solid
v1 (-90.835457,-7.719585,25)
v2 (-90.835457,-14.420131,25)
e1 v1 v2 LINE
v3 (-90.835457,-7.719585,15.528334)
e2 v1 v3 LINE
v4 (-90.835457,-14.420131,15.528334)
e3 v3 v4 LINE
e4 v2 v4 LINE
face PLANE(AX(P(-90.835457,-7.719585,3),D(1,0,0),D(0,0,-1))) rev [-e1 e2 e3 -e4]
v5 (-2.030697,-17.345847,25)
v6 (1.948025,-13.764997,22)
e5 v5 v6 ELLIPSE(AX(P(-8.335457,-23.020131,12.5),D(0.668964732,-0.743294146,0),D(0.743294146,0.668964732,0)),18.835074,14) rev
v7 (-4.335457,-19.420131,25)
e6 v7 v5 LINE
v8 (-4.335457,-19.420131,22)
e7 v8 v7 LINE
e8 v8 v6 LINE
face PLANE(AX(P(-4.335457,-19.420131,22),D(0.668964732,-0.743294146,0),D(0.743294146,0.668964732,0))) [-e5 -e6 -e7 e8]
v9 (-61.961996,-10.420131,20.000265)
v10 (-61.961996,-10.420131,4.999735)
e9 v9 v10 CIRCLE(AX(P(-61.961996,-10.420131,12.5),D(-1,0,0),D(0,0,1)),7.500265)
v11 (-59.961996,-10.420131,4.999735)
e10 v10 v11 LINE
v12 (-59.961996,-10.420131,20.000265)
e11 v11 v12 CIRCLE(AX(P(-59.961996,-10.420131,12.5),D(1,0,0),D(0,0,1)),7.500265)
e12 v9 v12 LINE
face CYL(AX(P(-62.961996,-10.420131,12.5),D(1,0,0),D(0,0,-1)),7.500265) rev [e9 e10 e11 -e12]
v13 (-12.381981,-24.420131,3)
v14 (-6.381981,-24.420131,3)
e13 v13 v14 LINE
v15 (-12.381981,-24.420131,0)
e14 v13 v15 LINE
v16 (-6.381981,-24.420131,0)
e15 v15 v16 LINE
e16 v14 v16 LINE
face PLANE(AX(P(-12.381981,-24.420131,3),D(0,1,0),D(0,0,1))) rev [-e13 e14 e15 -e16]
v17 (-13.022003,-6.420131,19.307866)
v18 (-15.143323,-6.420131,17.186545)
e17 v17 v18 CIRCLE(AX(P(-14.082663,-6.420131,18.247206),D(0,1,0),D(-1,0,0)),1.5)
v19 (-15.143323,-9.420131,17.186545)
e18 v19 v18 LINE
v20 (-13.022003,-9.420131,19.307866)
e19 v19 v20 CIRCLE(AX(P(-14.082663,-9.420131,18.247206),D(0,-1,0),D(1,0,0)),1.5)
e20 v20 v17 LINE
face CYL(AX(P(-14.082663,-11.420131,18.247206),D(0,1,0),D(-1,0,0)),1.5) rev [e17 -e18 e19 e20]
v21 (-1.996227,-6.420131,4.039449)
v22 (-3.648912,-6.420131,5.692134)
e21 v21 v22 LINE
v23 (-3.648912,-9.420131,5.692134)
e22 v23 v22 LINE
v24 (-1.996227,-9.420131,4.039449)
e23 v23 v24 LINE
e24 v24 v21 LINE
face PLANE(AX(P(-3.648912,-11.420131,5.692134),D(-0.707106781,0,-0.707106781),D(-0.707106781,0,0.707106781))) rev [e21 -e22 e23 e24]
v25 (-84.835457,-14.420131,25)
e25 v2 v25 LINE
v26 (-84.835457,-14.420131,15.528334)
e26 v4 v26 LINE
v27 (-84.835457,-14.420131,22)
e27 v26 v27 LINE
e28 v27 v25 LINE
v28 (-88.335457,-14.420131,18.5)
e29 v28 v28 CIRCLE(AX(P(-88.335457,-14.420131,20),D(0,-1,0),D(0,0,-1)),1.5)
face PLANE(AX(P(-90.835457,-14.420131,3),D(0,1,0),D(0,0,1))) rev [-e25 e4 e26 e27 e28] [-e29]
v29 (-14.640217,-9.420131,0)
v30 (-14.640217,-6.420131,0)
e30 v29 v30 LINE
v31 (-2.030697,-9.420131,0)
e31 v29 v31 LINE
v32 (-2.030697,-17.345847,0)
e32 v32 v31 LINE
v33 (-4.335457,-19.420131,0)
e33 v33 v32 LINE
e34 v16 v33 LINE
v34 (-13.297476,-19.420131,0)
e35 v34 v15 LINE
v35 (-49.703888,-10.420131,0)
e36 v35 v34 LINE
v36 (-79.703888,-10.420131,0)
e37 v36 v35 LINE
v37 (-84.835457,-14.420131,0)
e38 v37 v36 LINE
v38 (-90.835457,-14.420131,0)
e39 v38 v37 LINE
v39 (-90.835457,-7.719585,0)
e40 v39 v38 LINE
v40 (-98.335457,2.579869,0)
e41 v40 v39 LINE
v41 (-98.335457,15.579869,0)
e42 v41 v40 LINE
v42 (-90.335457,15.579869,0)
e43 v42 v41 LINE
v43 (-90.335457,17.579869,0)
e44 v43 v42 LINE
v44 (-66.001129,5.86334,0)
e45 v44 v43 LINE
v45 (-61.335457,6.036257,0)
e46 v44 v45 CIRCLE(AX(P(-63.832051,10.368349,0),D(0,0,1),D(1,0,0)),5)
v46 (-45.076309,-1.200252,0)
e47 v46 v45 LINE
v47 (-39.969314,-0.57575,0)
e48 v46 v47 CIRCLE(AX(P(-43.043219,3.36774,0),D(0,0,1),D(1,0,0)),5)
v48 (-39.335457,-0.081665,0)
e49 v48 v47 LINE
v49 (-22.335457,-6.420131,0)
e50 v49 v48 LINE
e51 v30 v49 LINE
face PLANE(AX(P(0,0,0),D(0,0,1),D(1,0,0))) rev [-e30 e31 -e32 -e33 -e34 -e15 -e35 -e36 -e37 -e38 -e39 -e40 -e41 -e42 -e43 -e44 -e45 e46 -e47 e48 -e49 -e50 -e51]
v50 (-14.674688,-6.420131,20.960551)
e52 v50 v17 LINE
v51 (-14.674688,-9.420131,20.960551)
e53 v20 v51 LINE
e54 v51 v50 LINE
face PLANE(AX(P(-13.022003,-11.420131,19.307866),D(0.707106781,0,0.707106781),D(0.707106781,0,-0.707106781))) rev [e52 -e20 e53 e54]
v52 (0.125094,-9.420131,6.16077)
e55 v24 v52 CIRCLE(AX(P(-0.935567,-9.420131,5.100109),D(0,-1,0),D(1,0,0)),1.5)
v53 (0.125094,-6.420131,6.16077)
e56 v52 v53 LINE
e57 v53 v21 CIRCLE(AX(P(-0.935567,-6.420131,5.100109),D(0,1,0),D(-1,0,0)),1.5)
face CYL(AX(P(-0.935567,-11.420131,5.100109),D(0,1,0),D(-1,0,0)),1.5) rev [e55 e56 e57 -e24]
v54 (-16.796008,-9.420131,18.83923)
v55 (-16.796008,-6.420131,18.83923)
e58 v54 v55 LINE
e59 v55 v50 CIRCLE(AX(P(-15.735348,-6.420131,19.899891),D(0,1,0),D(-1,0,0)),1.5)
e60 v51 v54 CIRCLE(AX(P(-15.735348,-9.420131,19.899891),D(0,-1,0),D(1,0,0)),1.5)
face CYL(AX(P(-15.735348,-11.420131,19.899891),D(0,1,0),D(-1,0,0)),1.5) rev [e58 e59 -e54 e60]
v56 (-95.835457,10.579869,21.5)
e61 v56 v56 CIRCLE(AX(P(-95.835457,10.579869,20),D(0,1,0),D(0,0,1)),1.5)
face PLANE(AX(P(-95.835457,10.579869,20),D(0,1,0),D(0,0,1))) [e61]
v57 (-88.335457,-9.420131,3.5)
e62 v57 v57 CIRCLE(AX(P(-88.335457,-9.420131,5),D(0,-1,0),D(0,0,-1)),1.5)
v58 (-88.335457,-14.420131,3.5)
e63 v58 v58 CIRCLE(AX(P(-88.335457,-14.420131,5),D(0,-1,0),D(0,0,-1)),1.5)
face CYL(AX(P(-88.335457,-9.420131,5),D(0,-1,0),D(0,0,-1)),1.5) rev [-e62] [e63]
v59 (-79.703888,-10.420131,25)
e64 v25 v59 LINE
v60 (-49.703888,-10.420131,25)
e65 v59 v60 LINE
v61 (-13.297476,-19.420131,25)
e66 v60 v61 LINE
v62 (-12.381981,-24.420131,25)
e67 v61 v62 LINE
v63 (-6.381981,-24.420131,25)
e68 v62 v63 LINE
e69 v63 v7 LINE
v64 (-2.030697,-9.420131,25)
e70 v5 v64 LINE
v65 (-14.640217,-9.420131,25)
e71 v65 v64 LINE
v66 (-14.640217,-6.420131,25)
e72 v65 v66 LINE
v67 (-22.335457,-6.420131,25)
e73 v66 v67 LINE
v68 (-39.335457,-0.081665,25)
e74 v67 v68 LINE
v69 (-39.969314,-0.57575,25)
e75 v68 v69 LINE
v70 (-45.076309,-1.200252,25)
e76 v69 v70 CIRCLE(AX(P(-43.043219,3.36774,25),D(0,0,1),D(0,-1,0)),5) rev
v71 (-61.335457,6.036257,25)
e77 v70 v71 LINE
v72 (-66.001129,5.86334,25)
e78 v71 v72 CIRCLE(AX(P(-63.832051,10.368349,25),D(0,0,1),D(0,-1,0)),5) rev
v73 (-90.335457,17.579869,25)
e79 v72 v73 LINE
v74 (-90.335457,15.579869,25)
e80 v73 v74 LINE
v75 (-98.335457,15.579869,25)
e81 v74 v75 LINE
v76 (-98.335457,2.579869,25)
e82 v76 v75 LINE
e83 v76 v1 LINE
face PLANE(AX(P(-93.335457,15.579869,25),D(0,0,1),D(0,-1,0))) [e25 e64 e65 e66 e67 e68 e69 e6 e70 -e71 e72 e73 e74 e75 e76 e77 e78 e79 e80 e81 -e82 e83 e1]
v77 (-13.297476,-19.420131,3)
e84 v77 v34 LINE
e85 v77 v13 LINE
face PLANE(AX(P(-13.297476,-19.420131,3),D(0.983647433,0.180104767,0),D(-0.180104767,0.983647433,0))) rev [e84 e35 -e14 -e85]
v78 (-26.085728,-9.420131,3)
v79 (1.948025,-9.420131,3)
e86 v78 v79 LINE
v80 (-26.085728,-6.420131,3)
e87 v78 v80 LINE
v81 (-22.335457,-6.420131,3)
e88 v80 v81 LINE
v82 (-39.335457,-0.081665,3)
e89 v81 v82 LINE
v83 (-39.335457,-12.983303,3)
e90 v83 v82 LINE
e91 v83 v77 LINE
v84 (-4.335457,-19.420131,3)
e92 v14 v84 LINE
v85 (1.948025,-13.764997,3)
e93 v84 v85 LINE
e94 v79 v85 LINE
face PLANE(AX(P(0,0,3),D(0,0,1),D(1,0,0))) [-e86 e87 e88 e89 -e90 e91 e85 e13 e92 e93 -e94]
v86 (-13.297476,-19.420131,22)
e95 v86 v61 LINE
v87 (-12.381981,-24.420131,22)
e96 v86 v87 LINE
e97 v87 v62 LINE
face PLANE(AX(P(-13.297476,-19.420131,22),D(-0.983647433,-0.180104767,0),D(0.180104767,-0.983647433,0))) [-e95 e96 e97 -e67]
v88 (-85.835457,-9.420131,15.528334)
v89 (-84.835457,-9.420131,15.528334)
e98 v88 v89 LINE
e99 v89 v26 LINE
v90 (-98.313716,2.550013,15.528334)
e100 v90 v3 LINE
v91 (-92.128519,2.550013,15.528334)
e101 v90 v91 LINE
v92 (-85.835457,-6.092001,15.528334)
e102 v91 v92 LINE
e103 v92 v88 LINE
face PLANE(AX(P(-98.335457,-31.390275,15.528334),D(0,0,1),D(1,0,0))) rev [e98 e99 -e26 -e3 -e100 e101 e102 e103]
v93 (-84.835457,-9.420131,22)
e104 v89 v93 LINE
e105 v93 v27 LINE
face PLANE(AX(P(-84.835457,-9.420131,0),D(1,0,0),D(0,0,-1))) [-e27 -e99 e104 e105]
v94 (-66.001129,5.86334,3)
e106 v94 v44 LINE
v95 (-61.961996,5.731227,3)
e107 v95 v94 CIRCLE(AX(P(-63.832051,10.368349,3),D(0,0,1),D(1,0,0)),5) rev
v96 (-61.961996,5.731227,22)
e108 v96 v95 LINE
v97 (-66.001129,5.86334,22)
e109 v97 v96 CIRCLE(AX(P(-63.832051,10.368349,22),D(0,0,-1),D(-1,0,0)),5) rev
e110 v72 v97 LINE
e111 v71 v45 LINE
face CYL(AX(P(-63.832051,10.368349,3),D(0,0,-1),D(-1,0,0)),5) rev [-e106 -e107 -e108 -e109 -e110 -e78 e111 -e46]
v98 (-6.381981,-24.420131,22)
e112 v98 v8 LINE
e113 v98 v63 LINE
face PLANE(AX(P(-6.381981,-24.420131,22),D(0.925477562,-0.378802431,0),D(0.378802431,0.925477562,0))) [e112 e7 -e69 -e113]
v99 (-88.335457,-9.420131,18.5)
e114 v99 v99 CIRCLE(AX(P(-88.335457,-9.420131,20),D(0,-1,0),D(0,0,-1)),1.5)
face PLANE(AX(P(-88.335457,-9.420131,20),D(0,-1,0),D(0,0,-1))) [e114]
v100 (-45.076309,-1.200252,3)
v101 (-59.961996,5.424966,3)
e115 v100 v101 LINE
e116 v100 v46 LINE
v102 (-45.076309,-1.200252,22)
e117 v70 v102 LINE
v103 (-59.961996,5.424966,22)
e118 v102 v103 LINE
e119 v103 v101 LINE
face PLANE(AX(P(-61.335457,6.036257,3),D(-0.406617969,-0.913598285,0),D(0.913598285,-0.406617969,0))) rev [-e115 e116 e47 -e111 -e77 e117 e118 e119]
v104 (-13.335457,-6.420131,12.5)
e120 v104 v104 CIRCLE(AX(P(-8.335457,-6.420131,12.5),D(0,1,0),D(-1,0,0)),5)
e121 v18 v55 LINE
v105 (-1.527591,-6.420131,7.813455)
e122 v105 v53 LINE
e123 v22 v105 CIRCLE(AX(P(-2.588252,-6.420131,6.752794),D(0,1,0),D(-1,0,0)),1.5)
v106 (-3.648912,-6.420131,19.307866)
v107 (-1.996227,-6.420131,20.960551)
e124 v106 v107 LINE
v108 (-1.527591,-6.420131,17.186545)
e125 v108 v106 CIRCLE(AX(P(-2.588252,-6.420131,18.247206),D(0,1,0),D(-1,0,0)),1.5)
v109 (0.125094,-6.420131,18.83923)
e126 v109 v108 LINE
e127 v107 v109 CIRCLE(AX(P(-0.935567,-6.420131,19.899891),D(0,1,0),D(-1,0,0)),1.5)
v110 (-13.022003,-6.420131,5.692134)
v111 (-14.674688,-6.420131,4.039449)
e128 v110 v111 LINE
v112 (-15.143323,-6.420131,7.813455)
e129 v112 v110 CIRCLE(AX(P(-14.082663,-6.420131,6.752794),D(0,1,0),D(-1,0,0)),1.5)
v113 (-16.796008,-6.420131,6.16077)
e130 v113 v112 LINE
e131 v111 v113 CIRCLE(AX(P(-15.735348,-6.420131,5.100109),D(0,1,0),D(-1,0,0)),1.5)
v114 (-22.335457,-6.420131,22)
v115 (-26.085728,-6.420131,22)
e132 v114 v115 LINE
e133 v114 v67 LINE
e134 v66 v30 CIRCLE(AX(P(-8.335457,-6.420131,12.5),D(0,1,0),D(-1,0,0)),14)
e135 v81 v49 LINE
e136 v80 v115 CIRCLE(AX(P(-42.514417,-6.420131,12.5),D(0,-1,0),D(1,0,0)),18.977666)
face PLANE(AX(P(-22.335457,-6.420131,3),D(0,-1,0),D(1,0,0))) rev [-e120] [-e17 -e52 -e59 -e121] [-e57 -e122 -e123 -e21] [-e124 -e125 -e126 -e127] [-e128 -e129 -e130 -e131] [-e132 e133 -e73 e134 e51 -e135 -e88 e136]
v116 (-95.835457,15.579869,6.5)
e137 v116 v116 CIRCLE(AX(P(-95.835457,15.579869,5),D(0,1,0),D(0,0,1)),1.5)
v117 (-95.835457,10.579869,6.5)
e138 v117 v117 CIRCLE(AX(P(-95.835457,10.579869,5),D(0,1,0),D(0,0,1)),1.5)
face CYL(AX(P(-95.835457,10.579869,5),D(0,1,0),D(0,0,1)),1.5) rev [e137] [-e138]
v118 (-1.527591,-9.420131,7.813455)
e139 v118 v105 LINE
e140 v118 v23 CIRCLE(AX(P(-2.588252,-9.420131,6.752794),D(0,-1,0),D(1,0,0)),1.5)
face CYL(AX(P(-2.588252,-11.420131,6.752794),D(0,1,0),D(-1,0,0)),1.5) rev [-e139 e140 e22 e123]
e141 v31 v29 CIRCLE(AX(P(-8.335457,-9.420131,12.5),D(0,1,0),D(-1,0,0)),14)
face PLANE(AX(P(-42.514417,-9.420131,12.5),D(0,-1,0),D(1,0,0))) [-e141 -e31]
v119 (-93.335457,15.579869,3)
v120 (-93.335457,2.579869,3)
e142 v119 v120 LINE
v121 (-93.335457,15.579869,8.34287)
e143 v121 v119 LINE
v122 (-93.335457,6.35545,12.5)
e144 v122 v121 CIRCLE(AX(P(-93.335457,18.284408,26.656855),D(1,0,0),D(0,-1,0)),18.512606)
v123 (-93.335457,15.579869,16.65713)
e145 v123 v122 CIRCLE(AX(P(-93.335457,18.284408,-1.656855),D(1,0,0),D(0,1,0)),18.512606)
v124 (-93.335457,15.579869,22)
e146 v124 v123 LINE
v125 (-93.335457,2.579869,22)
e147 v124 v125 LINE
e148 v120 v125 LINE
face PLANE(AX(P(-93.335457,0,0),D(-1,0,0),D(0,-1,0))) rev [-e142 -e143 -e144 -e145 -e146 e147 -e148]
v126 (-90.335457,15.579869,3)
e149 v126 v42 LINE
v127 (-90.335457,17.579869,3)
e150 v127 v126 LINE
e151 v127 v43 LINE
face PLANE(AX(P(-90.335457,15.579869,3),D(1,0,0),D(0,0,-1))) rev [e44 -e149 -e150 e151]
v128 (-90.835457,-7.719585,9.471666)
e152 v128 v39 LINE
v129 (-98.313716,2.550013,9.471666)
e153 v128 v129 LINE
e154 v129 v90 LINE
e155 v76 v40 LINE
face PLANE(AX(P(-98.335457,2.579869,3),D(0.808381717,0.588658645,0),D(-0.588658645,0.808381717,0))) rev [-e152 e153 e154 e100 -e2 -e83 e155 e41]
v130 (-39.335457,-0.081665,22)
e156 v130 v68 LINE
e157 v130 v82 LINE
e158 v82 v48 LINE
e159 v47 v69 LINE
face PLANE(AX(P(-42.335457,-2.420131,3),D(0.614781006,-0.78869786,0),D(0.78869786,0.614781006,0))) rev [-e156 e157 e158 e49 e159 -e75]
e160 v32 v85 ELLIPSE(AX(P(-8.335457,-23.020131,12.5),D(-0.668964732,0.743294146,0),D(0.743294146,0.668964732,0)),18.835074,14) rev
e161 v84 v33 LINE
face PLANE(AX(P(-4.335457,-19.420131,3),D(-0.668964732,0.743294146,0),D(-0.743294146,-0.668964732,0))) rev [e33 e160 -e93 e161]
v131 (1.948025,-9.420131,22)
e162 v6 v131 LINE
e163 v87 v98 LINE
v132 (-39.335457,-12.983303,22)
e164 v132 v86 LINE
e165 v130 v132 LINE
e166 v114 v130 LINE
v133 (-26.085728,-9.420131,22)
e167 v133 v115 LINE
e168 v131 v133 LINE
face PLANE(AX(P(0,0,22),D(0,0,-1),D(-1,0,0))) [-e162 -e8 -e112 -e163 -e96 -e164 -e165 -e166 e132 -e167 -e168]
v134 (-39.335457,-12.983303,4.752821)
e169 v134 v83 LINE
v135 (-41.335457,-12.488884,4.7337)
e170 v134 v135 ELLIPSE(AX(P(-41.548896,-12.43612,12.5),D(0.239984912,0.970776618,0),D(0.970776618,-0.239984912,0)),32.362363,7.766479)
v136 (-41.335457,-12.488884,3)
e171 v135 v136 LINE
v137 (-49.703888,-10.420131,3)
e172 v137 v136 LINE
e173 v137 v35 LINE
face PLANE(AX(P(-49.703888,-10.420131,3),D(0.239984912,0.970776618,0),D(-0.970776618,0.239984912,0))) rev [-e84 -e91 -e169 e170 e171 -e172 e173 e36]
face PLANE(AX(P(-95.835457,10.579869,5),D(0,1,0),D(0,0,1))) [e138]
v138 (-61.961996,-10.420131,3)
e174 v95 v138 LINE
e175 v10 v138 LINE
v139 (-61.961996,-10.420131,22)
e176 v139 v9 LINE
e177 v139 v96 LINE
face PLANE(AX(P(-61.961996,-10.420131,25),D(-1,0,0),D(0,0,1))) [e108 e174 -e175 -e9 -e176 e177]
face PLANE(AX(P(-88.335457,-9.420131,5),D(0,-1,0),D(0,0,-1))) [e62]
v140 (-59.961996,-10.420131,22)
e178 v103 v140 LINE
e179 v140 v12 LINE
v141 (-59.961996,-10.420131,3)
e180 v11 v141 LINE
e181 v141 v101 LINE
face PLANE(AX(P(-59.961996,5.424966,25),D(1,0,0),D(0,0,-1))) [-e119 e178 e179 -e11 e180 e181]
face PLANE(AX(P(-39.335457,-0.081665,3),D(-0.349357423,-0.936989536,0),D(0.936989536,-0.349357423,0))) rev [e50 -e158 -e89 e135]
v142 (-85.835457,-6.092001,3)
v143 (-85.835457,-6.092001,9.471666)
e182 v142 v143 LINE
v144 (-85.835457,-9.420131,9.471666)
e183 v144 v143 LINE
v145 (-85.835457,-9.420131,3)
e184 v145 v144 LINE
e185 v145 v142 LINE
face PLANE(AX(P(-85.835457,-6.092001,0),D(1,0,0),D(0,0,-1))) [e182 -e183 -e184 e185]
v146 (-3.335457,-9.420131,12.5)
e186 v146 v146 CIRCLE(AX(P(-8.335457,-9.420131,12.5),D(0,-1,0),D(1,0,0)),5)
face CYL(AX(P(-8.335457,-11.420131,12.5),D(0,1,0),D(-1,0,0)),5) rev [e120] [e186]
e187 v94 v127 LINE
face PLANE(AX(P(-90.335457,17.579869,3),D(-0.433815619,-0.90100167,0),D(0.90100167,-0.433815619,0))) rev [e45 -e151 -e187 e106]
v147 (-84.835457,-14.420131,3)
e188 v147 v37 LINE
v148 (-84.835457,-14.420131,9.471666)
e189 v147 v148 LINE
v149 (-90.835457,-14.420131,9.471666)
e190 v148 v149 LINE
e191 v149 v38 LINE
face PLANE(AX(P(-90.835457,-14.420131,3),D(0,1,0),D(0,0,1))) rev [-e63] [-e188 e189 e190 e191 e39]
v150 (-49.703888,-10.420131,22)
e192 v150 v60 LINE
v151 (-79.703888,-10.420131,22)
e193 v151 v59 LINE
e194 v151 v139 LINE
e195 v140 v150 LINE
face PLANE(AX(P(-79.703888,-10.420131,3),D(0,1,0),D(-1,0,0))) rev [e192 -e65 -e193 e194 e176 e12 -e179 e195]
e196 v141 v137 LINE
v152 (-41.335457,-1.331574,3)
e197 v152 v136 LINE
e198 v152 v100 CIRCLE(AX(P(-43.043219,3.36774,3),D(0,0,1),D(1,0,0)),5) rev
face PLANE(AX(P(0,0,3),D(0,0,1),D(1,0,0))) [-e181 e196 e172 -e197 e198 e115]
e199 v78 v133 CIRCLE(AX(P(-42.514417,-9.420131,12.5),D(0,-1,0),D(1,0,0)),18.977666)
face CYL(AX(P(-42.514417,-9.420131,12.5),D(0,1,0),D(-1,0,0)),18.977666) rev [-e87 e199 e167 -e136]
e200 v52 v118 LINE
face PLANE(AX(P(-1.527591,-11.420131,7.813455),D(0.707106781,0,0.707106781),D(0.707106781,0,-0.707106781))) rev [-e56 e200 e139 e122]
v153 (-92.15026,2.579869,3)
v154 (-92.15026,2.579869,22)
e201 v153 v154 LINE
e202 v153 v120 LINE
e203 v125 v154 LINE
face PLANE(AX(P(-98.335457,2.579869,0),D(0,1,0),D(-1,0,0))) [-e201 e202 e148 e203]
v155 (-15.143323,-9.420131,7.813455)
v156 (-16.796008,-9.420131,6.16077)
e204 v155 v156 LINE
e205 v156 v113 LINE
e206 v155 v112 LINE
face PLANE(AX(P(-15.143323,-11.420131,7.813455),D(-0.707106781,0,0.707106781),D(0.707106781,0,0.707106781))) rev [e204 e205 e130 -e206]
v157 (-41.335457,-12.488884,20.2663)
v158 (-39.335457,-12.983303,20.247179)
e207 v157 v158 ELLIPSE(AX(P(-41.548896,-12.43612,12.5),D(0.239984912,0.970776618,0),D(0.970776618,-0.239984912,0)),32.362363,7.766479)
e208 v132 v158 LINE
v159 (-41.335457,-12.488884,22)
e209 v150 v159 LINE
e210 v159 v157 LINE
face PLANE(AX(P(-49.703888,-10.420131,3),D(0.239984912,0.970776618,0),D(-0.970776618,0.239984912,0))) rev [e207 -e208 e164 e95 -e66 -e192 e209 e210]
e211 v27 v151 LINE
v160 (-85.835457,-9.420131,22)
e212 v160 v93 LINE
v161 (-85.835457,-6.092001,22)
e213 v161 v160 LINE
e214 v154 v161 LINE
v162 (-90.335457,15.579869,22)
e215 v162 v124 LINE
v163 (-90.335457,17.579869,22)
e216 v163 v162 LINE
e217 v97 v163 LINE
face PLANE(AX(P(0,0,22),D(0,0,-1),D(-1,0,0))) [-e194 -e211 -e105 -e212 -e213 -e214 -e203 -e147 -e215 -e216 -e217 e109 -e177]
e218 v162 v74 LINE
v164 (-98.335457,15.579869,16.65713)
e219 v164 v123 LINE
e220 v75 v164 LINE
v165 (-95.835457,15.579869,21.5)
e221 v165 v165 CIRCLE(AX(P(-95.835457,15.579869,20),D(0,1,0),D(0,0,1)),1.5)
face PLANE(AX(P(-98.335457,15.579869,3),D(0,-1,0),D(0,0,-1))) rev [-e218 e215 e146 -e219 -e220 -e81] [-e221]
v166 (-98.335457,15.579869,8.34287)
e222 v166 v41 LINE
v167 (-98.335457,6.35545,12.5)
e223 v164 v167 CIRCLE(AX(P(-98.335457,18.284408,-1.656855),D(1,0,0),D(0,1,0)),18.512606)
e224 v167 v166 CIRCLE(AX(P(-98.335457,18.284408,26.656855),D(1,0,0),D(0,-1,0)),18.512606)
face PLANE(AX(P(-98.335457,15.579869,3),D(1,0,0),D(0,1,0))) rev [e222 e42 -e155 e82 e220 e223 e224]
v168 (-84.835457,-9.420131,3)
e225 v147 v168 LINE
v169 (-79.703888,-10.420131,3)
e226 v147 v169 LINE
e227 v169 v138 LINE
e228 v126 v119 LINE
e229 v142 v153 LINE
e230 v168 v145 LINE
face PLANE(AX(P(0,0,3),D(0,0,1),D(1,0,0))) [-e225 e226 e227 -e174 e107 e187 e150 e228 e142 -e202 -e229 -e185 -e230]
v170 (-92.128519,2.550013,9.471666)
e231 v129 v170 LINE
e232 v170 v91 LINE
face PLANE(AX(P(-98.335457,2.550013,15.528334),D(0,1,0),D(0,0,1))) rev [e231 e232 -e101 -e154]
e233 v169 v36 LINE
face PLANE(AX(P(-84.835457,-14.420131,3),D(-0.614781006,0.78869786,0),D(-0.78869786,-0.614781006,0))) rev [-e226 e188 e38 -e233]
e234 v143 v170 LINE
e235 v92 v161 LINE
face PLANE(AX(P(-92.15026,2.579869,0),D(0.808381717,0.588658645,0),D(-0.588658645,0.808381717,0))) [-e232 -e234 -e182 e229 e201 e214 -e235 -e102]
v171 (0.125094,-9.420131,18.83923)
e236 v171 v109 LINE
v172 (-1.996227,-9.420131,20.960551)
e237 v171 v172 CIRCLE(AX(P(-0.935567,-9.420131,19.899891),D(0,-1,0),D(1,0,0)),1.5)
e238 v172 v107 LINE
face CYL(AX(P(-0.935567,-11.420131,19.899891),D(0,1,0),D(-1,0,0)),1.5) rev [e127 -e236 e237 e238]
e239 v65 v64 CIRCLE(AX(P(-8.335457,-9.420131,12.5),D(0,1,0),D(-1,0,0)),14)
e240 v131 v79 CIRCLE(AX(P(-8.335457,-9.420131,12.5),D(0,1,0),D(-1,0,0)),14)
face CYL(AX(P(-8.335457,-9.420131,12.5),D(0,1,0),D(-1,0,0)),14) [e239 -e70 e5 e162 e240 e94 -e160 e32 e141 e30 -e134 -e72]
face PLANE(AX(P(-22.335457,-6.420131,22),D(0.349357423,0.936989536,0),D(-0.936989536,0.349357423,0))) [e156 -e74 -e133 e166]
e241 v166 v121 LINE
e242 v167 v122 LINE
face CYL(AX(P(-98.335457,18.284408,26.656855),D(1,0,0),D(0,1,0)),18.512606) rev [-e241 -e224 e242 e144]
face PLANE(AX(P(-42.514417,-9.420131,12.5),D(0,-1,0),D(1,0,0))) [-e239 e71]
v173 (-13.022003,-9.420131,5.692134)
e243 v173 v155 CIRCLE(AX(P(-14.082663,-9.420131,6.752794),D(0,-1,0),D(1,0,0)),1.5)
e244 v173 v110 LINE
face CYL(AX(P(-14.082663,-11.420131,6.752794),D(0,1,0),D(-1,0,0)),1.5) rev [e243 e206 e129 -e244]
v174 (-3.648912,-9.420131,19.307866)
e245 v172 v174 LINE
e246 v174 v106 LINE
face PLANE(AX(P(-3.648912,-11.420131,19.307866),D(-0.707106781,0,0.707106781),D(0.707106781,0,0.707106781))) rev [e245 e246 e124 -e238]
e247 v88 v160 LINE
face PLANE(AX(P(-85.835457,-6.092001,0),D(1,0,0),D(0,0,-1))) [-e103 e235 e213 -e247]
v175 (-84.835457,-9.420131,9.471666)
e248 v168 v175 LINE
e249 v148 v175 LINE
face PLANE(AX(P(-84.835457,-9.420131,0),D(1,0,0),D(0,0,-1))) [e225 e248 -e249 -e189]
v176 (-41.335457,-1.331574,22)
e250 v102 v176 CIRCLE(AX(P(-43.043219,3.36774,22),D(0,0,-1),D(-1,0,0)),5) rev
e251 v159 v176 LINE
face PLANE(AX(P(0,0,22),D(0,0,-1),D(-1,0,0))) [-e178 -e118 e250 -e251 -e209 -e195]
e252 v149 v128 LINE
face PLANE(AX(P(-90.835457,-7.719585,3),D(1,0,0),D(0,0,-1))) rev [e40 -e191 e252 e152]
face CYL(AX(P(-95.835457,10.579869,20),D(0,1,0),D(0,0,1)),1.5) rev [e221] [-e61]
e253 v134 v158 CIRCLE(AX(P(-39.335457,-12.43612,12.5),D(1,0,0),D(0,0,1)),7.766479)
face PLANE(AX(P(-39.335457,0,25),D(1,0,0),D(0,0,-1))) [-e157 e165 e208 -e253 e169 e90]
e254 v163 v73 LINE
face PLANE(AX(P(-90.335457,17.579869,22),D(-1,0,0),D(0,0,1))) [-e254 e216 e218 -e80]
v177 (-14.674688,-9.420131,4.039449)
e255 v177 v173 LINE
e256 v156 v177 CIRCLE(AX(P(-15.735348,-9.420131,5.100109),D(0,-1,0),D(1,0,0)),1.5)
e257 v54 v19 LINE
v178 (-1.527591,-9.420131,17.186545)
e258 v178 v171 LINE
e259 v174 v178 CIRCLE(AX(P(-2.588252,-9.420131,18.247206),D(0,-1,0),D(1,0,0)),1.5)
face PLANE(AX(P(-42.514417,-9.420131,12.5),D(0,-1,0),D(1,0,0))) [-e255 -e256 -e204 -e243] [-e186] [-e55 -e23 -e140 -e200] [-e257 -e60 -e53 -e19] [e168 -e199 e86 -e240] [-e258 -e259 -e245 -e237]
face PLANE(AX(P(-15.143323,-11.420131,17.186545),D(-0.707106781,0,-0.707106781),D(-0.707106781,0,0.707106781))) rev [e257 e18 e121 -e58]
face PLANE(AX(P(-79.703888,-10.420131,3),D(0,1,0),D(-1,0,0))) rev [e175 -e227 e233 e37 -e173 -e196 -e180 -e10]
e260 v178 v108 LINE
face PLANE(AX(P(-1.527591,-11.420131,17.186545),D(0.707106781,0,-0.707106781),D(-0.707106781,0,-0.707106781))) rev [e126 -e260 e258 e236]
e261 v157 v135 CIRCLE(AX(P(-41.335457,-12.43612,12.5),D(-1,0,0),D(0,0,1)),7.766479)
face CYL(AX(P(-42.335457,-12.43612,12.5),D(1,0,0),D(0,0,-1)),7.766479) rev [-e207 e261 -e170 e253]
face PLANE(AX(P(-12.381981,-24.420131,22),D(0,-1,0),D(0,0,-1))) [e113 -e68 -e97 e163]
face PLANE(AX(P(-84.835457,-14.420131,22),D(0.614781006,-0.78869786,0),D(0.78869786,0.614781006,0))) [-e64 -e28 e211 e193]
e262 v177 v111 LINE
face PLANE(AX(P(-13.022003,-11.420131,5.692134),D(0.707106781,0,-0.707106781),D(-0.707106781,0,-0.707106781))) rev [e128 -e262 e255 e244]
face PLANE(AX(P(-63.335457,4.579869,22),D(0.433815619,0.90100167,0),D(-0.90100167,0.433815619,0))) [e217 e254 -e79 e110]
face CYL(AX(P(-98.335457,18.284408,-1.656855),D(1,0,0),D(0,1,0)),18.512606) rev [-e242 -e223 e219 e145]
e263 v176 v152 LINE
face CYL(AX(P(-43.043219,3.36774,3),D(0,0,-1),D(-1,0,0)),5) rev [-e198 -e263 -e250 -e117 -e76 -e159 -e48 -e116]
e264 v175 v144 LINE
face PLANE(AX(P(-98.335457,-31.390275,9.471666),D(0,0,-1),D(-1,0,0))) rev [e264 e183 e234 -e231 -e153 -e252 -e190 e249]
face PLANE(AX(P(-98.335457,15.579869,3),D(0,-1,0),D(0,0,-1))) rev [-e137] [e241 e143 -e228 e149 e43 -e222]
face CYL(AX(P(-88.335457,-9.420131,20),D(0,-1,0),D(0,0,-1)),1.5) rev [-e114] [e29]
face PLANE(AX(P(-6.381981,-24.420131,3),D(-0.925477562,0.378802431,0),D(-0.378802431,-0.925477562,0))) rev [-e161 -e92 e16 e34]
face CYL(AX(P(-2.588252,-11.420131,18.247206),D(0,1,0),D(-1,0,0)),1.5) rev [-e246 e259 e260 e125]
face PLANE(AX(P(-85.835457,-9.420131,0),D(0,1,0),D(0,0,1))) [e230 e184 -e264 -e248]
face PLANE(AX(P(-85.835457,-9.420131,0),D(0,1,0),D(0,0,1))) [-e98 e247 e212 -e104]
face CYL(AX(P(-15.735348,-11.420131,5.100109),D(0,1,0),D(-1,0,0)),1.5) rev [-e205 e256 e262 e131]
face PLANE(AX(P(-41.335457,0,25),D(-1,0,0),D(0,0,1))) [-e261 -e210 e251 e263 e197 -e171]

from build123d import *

# Parameters (mm, degrees)
EXTRUDE_1_DEPTH     = 3
SKETCH_2_W          = 25
SKETCH_2_H          = 13
EXTRUDE_2_DEPTH     = 5
EXTRUDE_3_DEPTH     = 3
EXTRUDE_4_REACH     = 106.361
CUT_EXTRUDE_1_DEPTH = 105.987345913
SKETCH_6_W          = 6.056667596
SKETCH_6_H          = 33.940287548
CUT_EXTRUDE_2_DEPTH = 98.013364038
EXTRUDE_5_REACH     = 106.361
CUT_EXTRUDE_3_DEPTH = 3
CUT_EXTRUDE_4_DEPTH = 3
EXTRUDE_6_DEPTH     = 3
CUT_EXTRUDE_5_DEPTH = 105.633226751
SKETCH_12_R         = 5
CUT_EXTRUDE_6_DEPTH = 5
SKETCH_13_R         = 1.5
CUT_EXTRUDE_7_DEPTH = 5
SKETCH_14_R         = 1.5
CUT_EXTRUDE_8_DEPTH = 5
FILLET_1_DEPTH      = 3
FILLET_START        = 22
FILLET_1_2_DEPTH    = 3
FILLET_START_2      = 2.3595
FILLET_1_3_DEPTH    = 20


with BuildPart() as part:
    # 草图1 → 凸台-拉伸1 (new body)
    with BuildSketch(Plane.XY):
        Polygon((-98.335457187, 15.579868922), (-90.335457187, 15.579868922), (-90.335457187, 17.579868922), (-63.335457187, 4.579868922), (-61.335457187, 6.036256747), (-42.335457187, -2.420131078), (-39.335457187, -0.081665222), (-22.335457187, -6.420131078), (-10.835457187, -6.420131078), (5.664542813, -6.420131078), (5.664542813, -10.420131078), (-4.335457187, -19.420131078), (-6.381981311, -24.420131078), (-12.381981311, -24.420131078), (-13.29747583, -19.420131078), (-49.703887716, -10.420131078), (-79.703887716, -10.420131078), (-84.835457187, -14.420131078), (-90.835457187, -14.420131078), (-90.835457187, -7.719585483), (-98.335457187, 2.579868922), align=None)
    extrude(amount=EXTRUDE_1_DEPTH)

    # 草图2 → 凸台-拉伸2 (add)
    with BuildSketch(Plane.ZY.offset(98.335457187)):
        with Locations((12.5, 9.079868922)):
            Rectangle(SKETCH_2_W, SKETCH_2_H)
    extrude(amount=-EXTRUDE_2_DEPTH)

    # 草图3 → 凸台-拉伸3 (add)
    with BuildSketch(Plane.XY.offset(25)):
        Polygon((-90.335457187, 15.579868922), (-98.335457187, 15.579868922), (-98.335457187, 2.579868922), (-90.835457187, -7.719585483), (-90.835457187, -14.420131078), (-84.835457187, -14.420131078), (-79.703887716, -10.420131078), (-49.703887716, -10.420131078), (-13.29747583, -19.420131078), (-12.381981311, -24.420131078), (-6.381981311, -24.420131078), (-4.335457187, -19.420131078), (5.664542813, -10.420131078), (5.664542813, -6.420131078), (-22.335457187, -6.420131078), (-39.335457187, -0.081665222), (-42.335457187, -2.420131078), (-61.335457187, 6.036256747), (-63.335457187, 4.579868922), (-90.335457187, 17.579868922), align=None)
    extrude(amount=-EXTRUDE_3_DEPTH)

    # 草图4 → 凸台-拉伸4 (add, up to next)
    with BuildSketch(Plane.XY.offset(25), mode=Mode.PRIVATE) as extrude_4_sk1:
        Polygon((-98.335457187, 2.579868922), (-90.835457187, -7.719585483), (-90.835457187, -14.420131078), (-84.835457187, -14.420131078), (-84.835457187, -9.420131078), (-85.835457187, -9.420131078), (-85.835457187, -6.09200144), (-92.150260395, 2.579868922), align=None)
    extrude_4_tool1 = extrude(extrude_4_sk1.sketch, amount=-EXTRUDE_4_REACH, mode=Mode.PRIVATE) - part.part
    add(extrude_4_tool1.solids().sort_by_distance((-90.201592, -5.80053, 25))[0])

    # 草图5 → 切除-拉伸1 (cut, through all)
    with BuildSketch(Plane(origin=(-93.335457187, 0, 0), x_dir=(0, 0, -1), z_dir=(1, 0, 0))):
        with BuildLine():
            Line((-16.657130076, 15.579868922), (-8.342869924, 15.579868922))
            ThreePointArc((-8.342869924, 15.579868922), (-9.779019247, 10.678144674), (-12.5, 6.355450003))
            ThreePointArc((-12.5, 6.355450003), (-15.220980753, 10.678144674), (-16.657130076, 15.579868922))
        make_face()
    extrude(amount=-CUT_EXTRUDE_1_DEPTH, mode=Mode.SUBTRACT)

    # 草图6 → 切除-拉伸2 (cut, through all)
    with BuildSketch(Plane(origin=(-84.835457187, 0, 0), x_dir=(0, 0, -1), z_dir=(1, 0, 0))):
        with Locations((-12.5, -14.420131078)):
            Rectangle(SKETCH_6_W, SKETCH_6_H)
    extrude(amount=-CUT_EXTRUDE_2_DEPTH, mode=Mode.SUBTRACT)

    # 草图7 → 凸台-拉伸5 (add, up to next)
    with BuildSketch(Plane(origin=(0, 0, 0), x_dir=(-1, 0, 0), z_dir=(0, 0, -1)), mode=Mode.PRIVATE) as extrude_5_sk1:
        Polygon((41.335457187, -1.64064246), (39.335457187, -0.081665222), (39.335457187, -12.983302507), (41.335457187, -12.488884104), align=None)
    extrude_5_tool1 = extrude(extrude_5_sk1.sketch, amount=-EXTRUDE_5_REACH, mode=Mode.PRIVATE) - part.part
    # 草图7 → 凸台-拉伸5 (add, up to next)
    with BuildSketch(Plane(origin=(0, 0, 0), x_dir=(-1, 0, 0), z_dir=(0, 0, -1)), mode=Mode.PRIVATE) as extrude_5_sk2:
        Polygon((59.961995831, 5.424966121), (59.961995831, -10.420131078), (61.961995831, -10.420131078), (61.961995831, 5.580015121), (61.335457187, 6.036256747), align=None)
    extrude_5_tool2 = extrude(extrude_5_sk2.sketch, amount=-EXTRUDE_5_REACH, mode=Mode.PRIVATE) - part.part
    add(extrude_5_tool1.solids().sort_by_distance((-40.306637, -6.790953, 0))[0])
    add(extrude_5_tool2.solids().sort_by_distance((-60.965536, -2.331748, 0))[0])

    # 草图8 → 切除-拉伸3 (cut)
    with BuildSketch(Plane(origin=(-39.335457187, 0, 0), x_dir=(0, 0, -1), z_dir=(1, 0, 0))):
        with BuildLine():
            Line((-20.2471791, -12.983302507), (-4.7528209, -12.983302507))
            ThreePointArc((-4.7528209, -12.983302507), (-12.5, -4.669641244), (-20.2471791, -12.983302507))
        make_face()
    extrude(amount=-CUT_EXTRUDE_3_DEPTH, mode=Mode.SUBTRACT)

    # 草图9 → 切除-拉伸4 (cut)
    with BuildSketch(Plane(origin=(-59.961995831, 0, 0), x_dir=(0, 0, -1), z_dir=(1, 0, 0))):
        with BuildLine():
            Line((-20.000265411, -10.420131078), (-4.999734589, -10.420131078))
            ThreePointArc((-4.999734589, -10.420131078), (-12.5, -2.919865667), (-20.000265411, -10.420131078))
        make_face()
    extrude(amount=-CUT_EXTRUDE_4_DEPTH, mode=Mode.SUBTRACT)

    # 草图10 → 凸台-拉伸6 (add)
    with BuildSketch(Plane(origin=(0, -6.420131078, 0), x_dir=(1, 0, 0), z_dir=(0, 1, 0))):
        with BuildLine():
            Line((-26.085728059, -3), (-26.085728059, 0))
            Line((-26.085728059, 0), (-14.640217294, 0))
            ThreePointArc((-14.640217294, 0), (5.664542813, -12.5), (-14.640217294, -25))
            Line((-14.640217294, -25), (-26.085728059, -25))
            Line((-26.085728059, -25), (-26.085728059, -22))
            ThreePointArc((-26.085728059, -22), (-23.536750664, -12.5), (-26.085728059, -3))
        make_face()
    extrude(amount=-EXTRUDE_6_DEPTH)

    # 草图11 → 切除-拉伸5 (cut, through all)
    with BuildSketch(Plane(origin=(0, -6.420131078, 0), x_dir=(1, 0, 0), z_dir=(0, 1, 0))):
        with BuildLine():
            Line((-2.030697081, 0), (16.123773985, 18.747228403))
            Line((16.123773985, 18.747228403), (16.123773985, -39.39165183))
            Line((16.123773985, -39.39165183), (-2.030697081, -25))
            ThreePointArc((-2.030697081, -25), (5.664542813, -12.5), (-2.030697081, 0))
        make_face()
    extrude(amount=-CUT_EXTRUDE_5_DEPTH, mode=Mode.SUBTRACT)

    # 草图12 → 切除-拉伸6 (cut)
    with BuildSketch(Plane(origin=(0, -6.420131078, 0), x_dir=(1, 0, 0), z_dir=(0, 1, 0))):
        with Locations(Location((-8.335457187, -12.5, 0), (0, 0, 180))):
            Circle(SKETCH_12_R)
        with BuildLine():
            Line((-1.527591385, -17.186545459), (0.125093583, -18.839230427))
            ThreePointArc((0.125093583, -18.839230427), (0.125093583, -20.960550771), (-1.99622676, -20.960550771))
            Line((-1.99622676, -20.960550771), (-3.648911729, -19.307865802))
            ThreePointArc((-3.648911729, -19.307865802), (-3.648911729, -17.186545459), (-1.527591385, -17.186545459))
        make_face()
        with BuildLine():
            Line((-13.022002646, -19.307865802), (-14.674687614, -20.960550771))
            ThreePointArc((-14.674687614, -20.960550771), (-16.796007958, -20.960550771), (-16.796007958, -18.839230427))
            Line((-16.796007958, -18.839230427), (-15.143322989, -17.186545459))
            ThreePointArc((-15.143322989, -17.186545459), (-13.022002646, -17.186545459), (-13.022002646, -19.307865802))
        make_face()
        with BuildLine():
            Line((-15.143322989, -7.813454541), (-16.796007958, -6.160769573))
            ThreePointArc((-16.796007958, -6.160769573), (-16.796007958, -4.039449229), (-14.674687614, -4.039449229))
            Line((-14.674687614, -4.039449229), (-13.022002646, -5.692134198))
            ThreePointArc((-13.022002646, -5.692134198), (-13.022002646, -7.813454541), (-15.143322989, -7.813454541))
        make_face()
        with BuildLine():
            Line((-3.648911729, -5.692134198), (-1.99622676, -4.039449229))
            ThreePointArc((-1.99622676, -4.039449229), (0.125093583, -4.039449229), (0.125093583, -6.160769573))
            Line((0.125093583, -6.160769573), (-1.527591385, -7.813454541))
            ThreePointArc((-1.527591385, -7.813454541), (-3.648911729, -7.813454541), (-3.648911729, -5.692134198))
        make_face()
    extrude(amount=-CUT_EXTRUDE_6_DEPTH, mode=Mode.SUBTRACT)

    # 草图13 → 切除-拉伸7 (cut)
    with BuildSketch(Plane(origin=(0, 15.579868922, 0), x_dir=(1, 0, 0), z_dir=(0, 1, 0))):
        with Locations(Location((-95.835457187, -5, 0), (0, 0, 270))):
            Circle(SKETCH_13_R)
        with Locations(Location((-95.835457187, -20, 0), (0, 0, 270))):
            Circle(SKETCH_13_R)
    extrude(amount=-CUT_EXTRUDE_7_DEPTH, mode=Mode.SUBTRACT)

    # 草图14 → 切除-拉伸8 (cut)
    with BuildSketch(Plane.XZ.offset(14.420131078)):
        with Locations(Location((-88.335457187, 20, 0), (0, 0, 270))):
            Circle(SKETCH_14_R)
        with Locations(Location((-88.335457187, 5, 0), (0, 0, 270))):
            Circle(SKETCH_14_R)
    extrude(amount=-CUT_EXTRUDE_8_DEPTH, mode=Mode.SUBTRACT)

    # 圆角1: read off the stored shape, not the designer's step
    # 圆角1 outline → 圆角1 (add)
    with BuildSketch(Plane.XY):
        with BuildLine():
            ThreePointArc((-39.969314292, -0.575749621), (-42.436321647, -1.595291169), (-45.076309168, -1.200251746))
            Line((-45.076309168, -1.200251746), (-42.335457187, -2.420131078))
            Line((-42.335457187, -2.420131078), (-39.969314292, -0.575749621))
        make_face()
        with BuildLine():
            ThreePointArc((-61.335457187, 6.036256747), (-63.646870744, 5.371779089), (-66.001128729, 5.863340405))
            Line((-66.001128729, 5.863340405), (-63.335457187, 4.579868922))
            Line((-63.335457187, 4.579868922), (-61.335457187, 6.036256747))
        make_face()
    extrude(amount=FILLET_1_DEPTH)

    # Fillet 1 2 outline → Fillet 1 2 (add)
    with BuildSketch(Plane.XY.offset(FILLET_START)):
        with BuildLine():
            ThreePointArc((-39.969314292, -0.575749621), (-42.436321647, -1.595291169), (-45.076309168, -1.200251746))
            Line((-45.076309168, -1.200251746), (-42.335457187, -2.420131078))
            Line((-42.335457187, -2.420131078), (-39.969314292, -0.575749621))
        make_face()
        with BuildLine():
            ThreePointArc((-61.335457187, 6.036256747), (-63.646870744, 5.371779089), (-66.001128729, 5.863340405))
            Line((-66.001128729, 5.863340405), (-63.335457187, 4.579868922))
            Line((-63.335457187, 4.579868922), (-61.335457187, 6.036256747))
        make_face()
    extrude(amount=FILLET_1_2_DEPTH)

    # Fillet 1 3 outline → Fillet 1 3 (add)
    with BuildSketch(Plane.XY.offset(FILLET_START_2)):
        with BuildLine():
            Line((-41.335457187, -1.64064246), (-39.969314292, -0.575749621))
            ThreePointArc((-39.969314292, -0.575749621), (-40.622702266, -1.007314283), (-41.335457187, -1.331573939))
            Line((-41.335457187, -1.331573939), (-41.335457187, -1.64064246))
        make_face()
        with BuildLine():
            Line((-61.961995831, 5.580015121), (-61.335457187, 6.036256747))
            ThreePointArc((-61.335457187, 6.036256747), (-61.643406083, 5.872813744), (-61.961995831, 5.731227337))
            Line((-61.961995831, 5.731227337), (-61.961995831, 5.580015121))
        make_face()
    extrude(amount=FILLET_1_3_DEPTH)


solid = part.part
